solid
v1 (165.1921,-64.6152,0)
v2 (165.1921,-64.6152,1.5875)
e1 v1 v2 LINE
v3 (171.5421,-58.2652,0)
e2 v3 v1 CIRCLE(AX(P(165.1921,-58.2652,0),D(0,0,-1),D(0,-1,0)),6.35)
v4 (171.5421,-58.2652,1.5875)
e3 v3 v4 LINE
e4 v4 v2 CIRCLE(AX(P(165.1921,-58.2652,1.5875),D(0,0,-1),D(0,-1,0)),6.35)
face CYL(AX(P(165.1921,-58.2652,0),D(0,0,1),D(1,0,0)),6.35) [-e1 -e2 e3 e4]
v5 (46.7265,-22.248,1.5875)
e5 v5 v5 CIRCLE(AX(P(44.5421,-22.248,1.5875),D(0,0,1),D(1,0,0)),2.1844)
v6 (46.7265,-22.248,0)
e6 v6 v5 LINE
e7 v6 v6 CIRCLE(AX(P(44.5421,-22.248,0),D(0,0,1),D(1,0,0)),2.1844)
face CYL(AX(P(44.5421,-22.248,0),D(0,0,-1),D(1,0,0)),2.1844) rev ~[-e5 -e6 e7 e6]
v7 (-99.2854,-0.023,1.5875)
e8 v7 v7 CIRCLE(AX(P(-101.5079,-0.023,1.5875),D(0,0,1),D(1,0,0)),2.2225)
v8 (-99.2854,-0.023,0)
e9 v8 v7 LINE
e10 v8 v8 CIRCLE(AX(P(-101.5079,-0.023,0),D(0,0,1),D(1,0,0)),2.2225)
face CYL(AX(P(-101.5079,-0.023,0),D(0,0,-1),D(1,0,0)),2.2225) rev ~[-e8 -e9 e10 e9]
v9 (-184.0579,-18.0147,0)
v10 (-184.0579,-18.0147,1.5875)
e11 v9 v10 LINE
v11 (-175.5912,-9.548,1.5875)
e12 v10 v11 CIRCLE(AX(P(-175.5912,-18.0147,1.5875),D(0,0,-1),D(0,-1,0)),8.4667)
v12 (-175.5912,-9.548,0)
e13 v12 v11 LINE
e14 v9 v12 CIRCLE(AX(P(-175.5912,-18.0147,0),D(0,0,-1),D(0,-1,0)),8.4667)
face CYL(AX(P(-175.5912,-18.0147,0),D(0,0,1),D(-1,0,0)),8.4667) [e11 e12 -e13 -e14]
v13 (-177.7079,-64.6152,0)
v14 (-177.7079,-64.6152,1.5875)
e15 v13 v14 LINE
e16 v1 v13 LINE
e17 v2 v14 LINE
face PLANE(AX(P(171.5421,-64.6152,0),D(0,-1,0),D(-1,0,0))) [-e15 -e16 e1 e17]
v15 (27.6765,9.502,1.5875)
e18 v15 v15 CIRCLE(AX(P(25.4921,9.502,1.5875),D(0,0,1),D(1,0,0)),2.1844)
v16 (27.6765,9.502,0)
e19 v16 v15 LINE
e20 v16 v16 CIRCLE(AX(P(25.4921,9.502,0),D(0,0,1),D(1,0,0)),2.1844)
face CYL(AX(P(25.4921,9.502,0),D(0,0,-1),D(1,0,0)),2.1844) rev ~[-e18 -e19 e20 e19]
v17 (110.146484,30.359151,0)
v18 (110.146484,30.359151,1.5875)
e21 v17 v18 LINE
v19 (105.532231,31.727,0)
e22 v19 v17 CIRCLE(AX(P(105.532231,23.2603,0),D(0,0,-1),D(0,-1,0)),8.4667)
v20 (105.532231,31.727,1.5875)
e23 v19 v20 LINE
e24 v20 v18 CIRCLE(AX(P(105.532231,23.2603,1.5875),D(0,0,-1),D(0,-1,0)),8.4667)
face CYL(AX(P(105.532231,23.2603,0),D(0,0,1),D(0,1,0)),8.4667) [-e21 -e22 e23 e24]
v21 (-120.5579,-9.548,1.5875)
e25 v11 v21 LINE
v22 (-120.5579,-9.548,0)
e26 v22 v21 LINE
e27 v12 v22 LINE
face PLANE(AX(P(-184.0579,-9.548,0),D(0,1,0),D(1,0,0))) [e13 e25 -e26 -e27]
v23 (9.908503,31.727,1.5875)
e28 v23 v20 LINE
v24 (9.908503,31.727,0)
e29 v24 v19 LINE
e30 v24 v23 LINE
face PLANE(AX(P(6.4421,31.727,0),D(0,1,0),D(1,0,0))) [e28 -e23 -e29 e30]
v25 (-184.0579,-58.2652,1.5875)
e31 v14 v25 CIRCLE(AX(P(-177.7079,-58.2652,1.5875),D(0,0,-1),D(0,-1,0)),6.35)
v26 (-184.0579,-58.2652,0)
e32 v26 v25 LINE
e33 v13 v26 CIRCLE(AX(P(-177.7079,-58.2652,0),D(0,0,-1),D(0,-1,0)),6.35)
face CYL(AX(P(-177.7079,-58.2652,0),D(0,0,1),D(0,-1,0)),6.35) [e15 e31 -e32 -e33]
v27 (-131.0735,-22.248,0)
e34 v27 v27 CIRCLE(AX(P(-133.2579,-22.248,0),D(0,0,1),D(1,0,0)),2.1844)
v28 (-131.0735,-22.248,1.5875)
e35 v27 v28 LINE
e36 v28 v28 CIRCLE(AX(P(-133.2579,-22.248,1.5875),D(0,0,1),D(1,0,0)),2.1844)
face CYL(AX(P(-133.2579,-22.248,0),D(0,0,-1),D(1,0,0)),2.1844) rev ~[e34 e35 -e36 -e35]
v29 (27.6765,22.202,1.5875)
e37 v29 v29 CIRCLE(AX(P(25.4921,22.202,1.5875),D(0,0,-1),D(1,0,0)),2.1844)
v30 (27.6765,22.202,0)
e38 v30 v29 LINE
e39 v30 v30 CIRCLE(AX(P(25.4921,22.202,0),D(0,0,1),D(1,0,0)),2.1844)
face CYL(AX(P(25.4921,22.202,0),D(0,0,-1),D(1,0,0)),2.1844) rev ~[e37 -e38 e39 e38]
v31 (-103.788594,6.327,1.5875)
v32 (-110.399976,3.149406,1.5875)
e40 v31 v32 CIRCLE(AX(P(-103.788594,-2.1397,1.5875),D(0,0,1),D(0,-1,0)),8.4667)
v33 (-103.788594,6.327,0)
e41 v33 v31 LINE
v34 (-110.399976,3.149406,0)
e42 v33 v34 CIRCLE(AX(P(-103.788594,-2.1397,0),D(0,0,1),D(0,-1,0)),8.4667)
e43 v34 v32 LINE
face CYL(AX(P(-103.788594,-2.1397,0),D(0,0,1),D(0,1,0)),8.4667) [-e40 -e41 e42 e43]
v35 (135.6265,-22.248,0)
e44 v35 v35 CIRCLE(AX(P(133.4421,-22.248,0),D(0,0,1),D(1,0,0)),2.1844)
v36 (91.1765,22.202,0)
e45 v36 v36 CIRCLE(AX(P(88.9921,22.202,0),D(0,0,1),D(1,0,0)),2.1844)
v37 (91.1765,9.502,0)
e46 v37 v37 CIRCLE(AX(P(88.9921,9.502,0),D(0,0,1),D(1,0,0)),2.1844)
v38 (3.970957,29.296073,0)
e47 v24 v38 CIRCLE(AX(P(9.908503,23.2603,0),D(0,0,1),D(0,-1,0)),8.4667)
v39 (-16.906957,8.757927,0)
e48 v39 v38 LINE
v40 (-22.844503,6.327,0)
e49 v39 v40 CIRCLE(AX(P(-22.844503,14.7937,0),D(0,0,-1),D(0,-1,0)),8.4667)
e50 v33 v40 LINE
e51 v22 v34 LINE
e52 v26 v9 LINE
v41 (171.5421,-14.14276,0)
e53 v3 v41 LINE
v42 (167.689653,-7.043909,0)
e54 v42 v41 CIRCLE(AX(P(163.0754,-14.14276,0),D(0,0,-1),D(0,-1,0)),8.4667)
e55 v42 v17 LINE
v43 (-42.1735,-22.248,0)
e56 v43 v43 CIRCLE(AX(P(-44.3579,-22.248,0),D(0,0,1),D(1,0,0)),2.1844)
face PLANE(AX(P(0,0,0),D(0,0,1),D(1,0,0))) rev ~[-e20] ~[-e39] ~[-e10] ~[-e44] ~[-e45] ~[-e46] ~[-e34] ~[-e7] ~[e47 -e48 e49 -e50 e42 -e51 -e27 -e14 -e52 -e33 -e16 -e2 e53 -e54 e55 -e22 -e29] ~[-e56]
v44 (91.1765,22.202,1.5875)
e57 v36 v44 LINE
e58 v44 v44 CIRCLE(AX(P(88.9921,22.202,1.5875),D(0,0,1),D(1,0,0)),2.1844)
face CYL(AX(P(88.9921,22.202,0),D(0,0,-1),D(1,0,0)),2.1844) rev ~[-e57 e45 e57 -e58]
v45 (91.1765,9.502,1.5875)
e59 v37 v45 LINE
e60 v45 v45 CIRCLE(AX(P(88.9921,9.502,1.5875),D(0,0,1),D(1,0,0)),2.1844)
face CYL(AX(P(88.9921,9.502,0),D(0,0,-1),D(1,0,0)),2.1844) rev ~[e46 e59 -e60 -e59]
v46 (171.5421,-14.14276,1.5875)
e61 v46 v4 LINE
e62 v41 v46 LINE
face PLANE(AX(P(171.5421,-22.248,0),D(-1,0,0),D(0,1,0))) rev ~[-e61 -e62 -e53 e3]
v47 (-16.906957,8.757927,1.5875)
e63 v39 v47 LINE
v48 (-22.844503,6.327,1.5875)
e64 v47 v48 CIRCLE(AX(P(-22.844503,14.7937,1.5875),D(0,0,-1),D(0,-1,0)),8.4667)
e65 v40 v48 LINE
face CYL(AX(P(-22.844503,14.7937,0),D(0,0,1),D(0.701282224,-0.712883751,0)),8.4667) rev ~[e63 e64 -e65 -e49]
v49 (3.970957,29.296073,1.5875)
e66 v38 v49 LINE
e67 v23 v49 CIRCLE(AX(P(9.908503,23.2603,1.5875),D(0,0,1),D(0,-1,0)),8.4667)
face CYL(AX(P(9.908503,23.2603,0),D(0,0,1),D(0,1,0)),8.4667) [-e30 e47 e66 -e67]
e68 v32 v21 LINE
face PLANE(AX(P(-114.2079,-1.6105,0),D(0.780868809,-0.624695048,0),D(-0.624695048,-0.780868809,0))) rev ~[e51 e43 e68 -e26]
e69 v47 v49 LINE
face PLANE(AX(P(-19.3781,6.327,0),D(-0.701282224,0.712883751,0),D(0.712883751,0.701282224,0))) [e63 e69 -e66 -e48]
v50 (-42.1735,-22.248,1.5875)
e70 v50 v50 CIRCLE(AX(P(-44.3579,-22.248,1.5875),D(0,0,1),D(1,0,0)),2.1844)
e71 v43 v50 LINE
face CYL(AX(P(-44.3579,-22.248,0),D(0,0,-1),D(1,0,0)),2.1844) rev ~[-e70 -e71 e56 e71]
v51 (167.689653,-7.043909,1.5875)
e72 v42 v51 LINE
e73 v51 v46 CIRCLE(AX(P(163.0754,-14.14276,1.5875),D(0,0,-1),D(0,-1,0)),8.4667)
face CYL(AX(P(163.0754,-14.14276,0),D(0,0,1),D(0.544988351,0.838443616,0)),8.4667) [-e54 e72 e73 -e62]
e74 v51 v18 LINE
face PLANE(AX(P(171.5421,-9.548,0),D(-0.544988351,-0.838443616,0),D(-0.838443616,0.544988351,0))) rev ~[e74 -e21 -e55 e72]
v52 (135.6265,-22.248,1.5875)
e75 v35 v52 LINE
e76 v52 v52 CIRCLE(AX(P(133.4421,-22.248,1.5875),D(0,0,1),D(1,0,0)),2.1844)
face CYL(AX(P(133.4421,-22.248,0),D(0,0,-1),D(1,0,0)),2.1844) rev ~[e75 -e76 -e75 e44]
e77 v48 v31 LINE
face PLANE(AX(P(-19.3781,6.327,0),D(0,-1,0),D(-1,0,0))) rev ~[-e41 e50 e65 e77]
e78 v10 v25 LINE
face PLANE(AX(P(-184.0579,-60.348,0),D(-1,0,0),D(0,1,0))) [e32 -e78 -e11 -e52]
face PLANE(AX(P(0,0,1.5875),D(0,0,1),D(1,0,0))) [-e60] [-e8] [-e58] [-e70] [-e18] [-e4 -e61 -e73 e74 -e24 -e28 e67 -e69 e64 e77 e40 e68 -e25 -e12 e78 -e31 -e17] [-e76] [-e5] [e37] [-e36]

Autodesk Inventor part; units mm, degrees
ref_plane "YZ Plane" through (0, 0, 0) normal (1, 0, 0) x (0, 1, 0)
ref_plane "XZ Plane" through (0, 0, 0) normal (0, 1, 0) x (-1, 0, 0)
ref_plane "XY Plane" through (0, 0, 0) normal (0, 0, 1) x (1, 0, 0)
sketch "Sketch1" plane through (0, 0, 0) normal (0, 0, 1) x (1, 0, 0)
  circle A0 centre (-133.2579, -22.248) radius 2.1844
  circle A1 centre (-101.5079, -0.023) radius 2.2225
  circle A2 centre (-44.3579, -22.248) radius 2.1844
  circle A3 centre (25.4921, 9.502) radius 2.1844
  circle A4 centre (25.4921, 22.202) radius 2.1844
  circle A5 centre (88.9921, 9.502) radius 2.1844
  circle A6 centre (88.9921, 22.202) radius 2.1844
  circle A7 centre (44.5421, -22.248) radius 2.1844
  circle A8 centre (133.4421, -22.248) radius 2.1844
  line L0 (133.4421, -22.248) -> (171.5421, -22.248)
  line L1 (171.5421, -22.248) -> (171.5421, -60.348)
  line L2 (171.5421, -60.348) -> (-184.0579, -60.348)
  line L3 (-184.0579, -60.348) -> (-184.0579, -9.548)
  line L4 (-184.0579, -9.548) -> (-114.2079, -9.548)
  line L5 (-114.2079, -9.548) -> (-114.2079, 6.327)
  line L6 (-19.3781, 6.327) -> (-19.3781, 31.727)
  line L7 (-19.3781, 31.727) -> (6.4421, 31.727)
  line L8 (-19.3781, 6.327) -> (6.4421, 31.727)
  line L9 (6.4421, 31.727) -> (108.0421, 31.727)
  line L10 (108.0421, 31.727) -> (133.1583, 6.1953)
  line L11 (171.5421, -22.248) -> (108.0421, 31.727)
  line L12 (88.9921, 22.202) -> (108.0421, 22.202)
  line L13 (108.0421, 22.202) -> (108.0421, 31.727)
  line L14 (25.4921, 22.202) -> (6.4421, 22.202)
  line L15 (6.4421, 22.202) -> (6.4421, 31.727)
  line L16 (-19.3781, 6.327) -> (-101.5079, 6.327)
  line L17 (-101.5079, 6.327) -> (-114.2079, -9.548)
  line L18 (171.5421, -22.248) -> (171.5421, -9.548)
  line L19 (171.5421, -9.548) -> (108.0421, 31.727)
  line L20 (-114.2079, -9.548) -> (-120.5579, -9.548)
  line L21 (-101.5079, 6.327) -> (-107.8579, 6.327)
  line L22 (-107.8579, 6.327) -> (-120.5579, -9.548)
  line L23 (171.5421, -60.348) -> (171.5421, -64.6152)
  line L24 (171.5421, -64.6152) -> (-184.0579, -64.6152)
  line L25 (-184.0579, -64.6152) -> (-184.0579, -60.348)
  point P0 (0, 0)
  dimension "d0" = 38.1
  dimension "d1" = 38.1
  dimension "d2" = 355.6
  dimension "d3" = 50.8
  dimension "d4" = 69.85
  dimension "d5" = 15.875
  dimension "d7" = 25.4
  dimension "d10" = 19.05
  dimension "d11" = 19.05
  dimension "d14" = 12.7
  dimension "d17" = 6.35
  dimension "d18" = 6.35
  dimension "d21" = 4.2672
extrude "Extrusion2" add sketch "Sketch1" along normal blind 1.5875 contours L1 L2 L3 L4 L17 L16 L8 L9 L11 | L23 L24 L25 L2 | L22 L5 L4 | L17 L5 L22 L21
extrude "Extrusion3" add sketch "Sketch1" along normal blind 1.5875 contours L11 L19 L18
fillet "Fillet1" radius 8.4667 3 edges at (-107.8579, 6.327, 0.7937) (6.4421, 31.727, 0.7937) (-19.3781, 6.327, 0.7937)
fillet "Fillet2" radius 8.4667 3 edges at (108.0421, 31.727, 0.7937) (171.5421, -9.548, 0.7937) (-184.0579, -9.548, 0.7937)
fillet "Fillet3" radius 6.35 2 edges at (171.5421, -64.6152, 0.7937) (-184.0579, -64.6152, 0.7937)
properties part number "Skirt"
